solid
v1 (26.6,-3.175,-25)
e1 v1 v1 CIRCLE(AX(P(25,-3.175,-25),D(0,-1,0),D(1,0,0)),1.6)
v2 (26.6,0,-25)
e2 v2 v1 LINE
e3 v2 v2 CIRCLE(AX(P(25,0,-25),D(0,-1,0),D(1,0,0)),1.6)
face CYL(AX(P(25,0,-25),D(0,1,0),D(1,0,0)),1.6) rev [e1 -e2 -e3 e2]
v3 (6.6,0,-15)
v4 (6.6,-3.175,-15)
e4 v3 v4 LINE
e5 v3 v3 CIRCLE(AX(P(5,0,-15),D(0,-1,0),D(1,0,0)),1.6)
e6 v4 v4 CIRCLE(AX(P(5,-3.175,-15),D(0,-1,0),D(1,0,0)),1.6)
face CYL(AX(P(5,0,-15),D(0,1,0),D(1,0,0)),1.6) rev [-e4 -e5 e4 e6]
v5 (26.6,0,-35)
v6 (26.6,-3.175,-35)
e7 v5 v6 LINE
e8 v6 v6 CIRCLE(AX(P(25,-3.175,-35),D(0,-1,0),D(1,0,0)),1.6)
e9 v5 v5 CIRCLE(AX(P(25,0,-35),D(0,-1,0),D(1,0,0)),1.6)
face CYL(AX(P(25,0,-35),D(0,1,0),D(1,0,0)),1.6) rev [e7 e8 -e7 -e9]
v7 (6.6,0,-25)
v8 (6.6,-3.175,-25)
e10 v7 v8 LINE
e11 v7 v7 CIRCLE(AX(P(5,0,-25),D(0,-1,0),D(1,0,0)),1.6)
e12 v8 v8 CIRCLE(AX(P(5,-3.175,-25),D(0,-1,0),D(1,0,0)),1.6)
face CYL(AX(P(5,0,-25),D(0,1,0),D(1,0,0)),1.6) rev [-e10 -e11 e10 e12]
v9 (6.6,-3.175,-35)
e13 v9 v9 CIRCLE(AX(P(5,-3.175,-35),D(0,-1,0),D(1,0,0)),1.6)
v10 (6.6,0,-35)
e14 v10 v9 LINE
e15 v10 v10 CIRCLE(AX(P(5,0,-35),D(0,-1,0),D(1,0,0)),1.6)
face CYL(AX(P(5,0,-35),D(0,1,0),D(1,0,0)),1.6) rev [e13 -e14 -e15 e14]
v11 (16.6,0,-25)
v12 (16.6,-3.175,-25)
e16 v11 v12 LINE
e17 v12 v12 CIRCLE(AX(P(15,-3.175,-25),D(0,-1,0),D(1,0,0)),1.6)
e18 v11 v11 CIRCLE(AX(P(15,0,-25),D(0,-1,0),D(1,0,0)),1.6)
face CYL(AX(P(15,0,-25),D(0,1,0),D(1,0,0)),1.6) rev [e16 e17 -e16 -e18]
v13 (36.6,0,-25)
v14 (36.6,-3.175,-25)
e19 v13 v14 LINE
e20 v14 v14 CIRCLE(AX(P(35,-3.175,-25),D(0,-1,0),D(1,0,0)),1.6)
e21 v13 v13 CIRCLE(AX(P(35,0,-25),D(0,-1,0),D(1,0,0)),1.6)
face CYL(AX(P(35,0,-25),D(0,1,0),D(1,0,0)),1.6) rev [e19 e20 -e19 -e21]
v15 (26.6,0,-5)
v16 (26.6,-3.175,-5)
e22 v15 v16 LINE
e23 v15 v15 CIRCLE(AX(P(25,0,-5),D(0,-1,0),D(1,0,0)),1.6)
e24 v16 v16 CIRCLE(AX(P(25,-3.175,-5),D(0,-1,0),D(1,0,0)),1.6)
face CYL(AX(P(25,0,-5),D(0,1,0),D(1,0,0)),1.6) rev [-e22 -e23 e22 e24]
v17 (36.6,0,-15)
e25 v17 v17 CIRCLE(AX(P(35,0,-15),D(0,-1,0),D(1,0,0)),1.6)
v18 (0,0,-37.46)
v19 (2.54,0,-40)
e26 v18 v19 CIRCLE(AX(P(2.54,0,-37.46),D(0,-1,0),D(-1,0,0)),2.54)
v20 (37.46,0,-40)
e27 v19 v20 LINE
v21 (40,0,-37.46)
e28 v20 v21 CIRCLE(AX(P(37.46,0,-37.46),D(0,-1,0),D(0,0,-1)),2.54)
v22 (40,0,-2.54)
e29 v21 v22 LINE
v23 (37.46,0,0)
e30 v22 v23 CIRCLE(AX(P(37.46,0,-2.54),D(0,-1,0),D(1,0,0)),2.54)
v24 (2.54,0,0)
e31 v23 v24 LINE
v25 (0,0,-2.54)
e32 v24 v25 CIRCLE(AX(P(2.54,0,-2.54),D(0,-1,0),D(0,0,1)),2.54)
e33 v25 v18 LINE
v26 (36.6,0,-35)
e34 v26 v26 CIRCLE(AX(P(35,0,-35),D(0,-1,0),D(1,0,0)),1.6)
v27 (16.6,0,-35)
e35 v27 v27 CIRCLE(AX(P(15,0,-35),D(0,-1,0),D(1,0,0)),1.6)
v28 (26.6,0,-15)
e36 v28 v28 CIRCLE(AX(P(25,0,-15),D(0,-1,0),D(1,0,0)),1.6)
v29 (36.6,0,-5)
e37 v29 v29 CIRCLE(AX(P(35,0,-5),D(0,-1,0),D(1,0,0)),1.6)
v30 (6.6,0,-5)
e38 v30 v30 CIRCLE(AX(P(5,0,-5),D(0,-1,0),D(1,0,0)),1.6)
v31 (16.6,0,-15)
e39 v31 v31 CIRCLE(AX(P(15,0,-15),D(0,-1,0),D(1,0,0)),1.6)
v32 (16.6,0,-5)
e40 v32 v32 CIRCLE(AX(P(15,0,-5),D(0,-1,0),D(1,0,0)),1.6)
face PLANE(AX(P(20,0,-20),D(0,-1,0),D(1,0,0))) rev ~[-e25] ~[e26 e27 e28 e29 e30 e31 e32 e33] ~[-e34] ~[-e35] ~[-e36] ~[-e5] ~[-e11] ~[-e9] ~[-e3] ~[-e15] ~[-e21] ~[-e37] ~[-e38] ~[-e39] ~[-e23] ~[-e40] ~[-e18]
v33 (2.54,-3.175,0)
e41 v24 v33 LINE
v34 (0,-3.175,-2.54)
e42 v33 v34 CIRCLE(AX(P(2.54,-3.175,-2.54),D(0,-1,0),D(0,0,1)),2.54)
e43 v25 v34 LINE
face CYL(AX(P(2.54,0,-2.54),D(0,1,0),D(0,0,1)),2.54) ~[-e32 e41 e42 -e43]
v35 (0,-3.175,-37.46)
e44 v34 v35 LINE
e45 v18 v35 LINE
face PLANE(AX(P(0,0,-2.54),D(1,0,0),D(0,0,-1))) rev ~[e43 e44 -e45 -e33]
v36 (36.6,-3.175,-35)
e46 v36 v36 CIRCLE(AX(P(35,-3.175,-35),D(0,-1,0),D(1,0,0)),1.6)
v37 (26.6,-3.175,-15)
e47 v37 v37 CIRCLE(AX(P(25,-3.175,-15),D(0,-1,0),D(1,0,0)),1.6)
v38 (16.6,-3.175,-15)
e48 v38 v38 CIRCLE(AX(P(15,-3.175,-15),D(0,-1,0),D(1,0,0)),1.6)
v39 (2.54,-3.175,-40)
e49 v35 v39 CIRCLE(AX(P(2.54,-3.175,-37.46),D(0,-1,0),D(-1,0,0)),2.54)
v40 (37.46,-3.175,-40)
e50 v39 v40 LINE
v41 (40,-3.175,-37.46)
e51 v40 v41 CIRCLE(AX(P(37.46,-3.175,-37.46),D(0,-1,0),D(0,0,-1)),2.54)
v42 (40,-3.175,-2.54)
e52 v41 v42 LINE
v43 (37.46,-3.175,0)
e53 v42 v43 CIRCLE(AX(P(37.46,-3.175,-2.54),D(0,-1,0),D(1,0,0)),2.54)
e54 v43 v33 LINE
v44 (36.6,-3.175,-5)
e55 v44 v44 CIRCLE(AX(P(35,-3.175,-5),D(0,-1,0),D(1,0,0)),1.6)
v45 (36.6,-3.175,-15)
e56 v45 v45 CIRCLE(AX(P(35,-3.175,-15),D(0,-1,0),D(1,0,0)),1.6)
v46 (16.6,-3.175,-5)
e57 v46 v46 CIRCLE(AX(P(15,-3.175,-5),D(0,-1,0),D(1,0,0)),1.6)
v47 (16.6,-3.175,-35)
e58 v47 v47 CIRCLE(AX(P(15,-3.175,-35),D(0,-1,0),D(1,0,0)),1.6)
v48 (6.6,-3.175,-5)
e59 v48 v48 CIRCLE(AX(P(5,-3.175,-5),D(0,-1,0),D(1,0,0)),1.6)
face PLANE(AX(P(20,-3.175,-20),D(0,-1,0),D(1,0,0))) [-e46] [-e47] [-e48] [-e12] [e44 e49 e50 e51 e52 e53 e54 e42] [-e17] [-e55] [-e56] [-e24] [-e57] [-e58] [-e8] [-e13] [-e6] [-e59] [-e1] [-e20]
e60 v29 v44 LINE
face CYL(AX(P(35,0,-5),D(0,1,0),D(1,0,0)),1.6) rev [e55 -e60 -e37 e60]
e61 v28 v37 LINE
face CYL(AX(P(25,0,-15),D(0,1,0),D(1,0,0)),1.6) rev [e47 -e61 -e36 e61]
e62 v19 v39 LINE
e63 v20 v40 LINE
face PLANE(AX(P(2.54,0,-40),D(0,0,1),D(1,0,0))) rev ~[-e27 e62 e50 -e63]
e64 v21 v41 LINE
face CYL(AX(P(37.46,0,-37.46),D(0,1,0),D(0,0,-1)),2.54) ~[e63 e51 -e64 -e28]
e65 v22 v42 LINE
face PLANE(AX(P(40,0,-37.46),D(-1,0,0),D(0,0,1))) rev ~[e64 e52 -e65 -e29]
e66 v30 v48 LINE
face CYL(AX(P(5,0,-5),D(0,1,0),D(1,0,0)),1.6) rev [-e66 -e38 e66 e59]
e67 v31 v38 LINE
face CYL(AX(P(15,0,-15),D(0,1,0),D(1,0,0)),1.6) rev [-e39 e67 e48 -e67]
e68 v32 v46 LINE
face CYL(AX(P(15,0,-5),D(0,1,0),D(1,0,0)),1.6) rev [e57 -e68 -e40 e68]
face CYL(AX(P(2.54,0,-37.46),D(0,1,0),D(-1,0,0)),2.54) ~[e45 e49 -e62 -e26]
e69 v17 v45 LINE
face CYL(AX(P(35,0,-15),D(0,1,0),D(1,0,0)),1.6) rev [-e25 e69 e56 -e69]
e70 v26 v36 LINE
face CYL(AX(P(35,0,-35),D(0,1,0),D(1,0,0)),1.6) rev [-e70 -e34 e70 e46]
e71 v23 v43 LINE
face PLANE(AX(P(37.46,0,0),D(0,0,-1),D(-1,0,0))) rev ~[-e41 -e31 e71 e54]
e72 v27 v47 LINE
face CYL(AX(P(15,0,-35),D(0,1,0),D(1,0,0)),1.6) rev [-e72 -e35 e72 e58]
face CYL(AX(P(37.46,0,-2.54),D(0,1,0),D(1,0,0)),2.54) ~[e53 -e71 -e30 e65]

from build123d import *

# Parameters (mm, degrees)
F0_R     = 1.6
F1_DEPTH = 3.175


# Not quite as in the source:
# - a length typed as a fraction of an inch, garbled in the dataset ("3 / 203.2 mm" for 3/8 in), is restored


with BuildPart() as f1:
    # F0 (on Front) → F1 (new body)
    with BuildSketch(Plane.XZ):
        with BuildLine():
            Line((37.46, 0), (2.54, 0))
            ThreePointArc((2.54, 0), (0.7439487758, -0.7439487758), (0, -2.54))
            Line((0, -2.54), (0, -37.46))
            ThreePointArc((0, -37.46), (0.7439487758, -39.2560512242), (2.54, -40))
            Line((2.54, -40), (37.46, -40))
            ThreePointArc((37.46, -40), (39.2560512242, -39.2560512242), (40, -37.46))
            Line((40, -37.46), (40, -2.54))
            ThreePointArc((40, -2.54), (39.2560512242, -0.7439487758), (37.46, 0))
        make_face()
        with Locations((5, -35)):
            Circle(F0_R, mode=Mode.SUBTRACT)
        with Locations((15, -35)):
            Circle(F0_R, mode=Mode.SUBTRACT)
        with Locations((5, -25)):
            Circle(F0_R, mode=Mode.SUBTRACT)
        with Locations((15, -25)):
            Circle(F0_R, mode=Mode.SUBTRACT)
        with Locations((25, -35)):
            Circle(F0_R, mode=Mode.SUBTRACT)
        with Locations((35, -35)):
            Circle(F0_R, mode=Mode.SUBTRACT)
        with Locations((25, -25)):
            Circle(F0_R, mode=Mode.SUBTRACT)
        with Locations((35, -25)):
            Circle(F0_R, mode=Mode.SUBTRACT)
        with Locations((5, -15)):
            Circle(F0_R, mode=Mode.SUBTRACT)
        with Locations((15, -15)):
            Circle(F0_R, mode=Mode.SUBTRACT)
        with Locations((5, -5)):
            Circle(F0_R, mode=Mode.SUBTRACT)
        with Locations((15, -5)):
            Circle(F0_R, mode=Mode.SUBTRACT)
        with Locations((25, -15)):
            Circle(F0_R, mode=Mode.SUBTRACT)
        with Locations((35, -15)):
            Circle(F0_R, mode=Mode.SUBTRACT)
        with Locations((25, -5)):
            Circle(F0_R, mode=Mode.SUBTRACT)
        with Locations((35, -5)):
            Circle(F0_R, mode=Mode.SUBTRACT)
    extrude(amount=F1_DEPTH)


solid = f1.part
